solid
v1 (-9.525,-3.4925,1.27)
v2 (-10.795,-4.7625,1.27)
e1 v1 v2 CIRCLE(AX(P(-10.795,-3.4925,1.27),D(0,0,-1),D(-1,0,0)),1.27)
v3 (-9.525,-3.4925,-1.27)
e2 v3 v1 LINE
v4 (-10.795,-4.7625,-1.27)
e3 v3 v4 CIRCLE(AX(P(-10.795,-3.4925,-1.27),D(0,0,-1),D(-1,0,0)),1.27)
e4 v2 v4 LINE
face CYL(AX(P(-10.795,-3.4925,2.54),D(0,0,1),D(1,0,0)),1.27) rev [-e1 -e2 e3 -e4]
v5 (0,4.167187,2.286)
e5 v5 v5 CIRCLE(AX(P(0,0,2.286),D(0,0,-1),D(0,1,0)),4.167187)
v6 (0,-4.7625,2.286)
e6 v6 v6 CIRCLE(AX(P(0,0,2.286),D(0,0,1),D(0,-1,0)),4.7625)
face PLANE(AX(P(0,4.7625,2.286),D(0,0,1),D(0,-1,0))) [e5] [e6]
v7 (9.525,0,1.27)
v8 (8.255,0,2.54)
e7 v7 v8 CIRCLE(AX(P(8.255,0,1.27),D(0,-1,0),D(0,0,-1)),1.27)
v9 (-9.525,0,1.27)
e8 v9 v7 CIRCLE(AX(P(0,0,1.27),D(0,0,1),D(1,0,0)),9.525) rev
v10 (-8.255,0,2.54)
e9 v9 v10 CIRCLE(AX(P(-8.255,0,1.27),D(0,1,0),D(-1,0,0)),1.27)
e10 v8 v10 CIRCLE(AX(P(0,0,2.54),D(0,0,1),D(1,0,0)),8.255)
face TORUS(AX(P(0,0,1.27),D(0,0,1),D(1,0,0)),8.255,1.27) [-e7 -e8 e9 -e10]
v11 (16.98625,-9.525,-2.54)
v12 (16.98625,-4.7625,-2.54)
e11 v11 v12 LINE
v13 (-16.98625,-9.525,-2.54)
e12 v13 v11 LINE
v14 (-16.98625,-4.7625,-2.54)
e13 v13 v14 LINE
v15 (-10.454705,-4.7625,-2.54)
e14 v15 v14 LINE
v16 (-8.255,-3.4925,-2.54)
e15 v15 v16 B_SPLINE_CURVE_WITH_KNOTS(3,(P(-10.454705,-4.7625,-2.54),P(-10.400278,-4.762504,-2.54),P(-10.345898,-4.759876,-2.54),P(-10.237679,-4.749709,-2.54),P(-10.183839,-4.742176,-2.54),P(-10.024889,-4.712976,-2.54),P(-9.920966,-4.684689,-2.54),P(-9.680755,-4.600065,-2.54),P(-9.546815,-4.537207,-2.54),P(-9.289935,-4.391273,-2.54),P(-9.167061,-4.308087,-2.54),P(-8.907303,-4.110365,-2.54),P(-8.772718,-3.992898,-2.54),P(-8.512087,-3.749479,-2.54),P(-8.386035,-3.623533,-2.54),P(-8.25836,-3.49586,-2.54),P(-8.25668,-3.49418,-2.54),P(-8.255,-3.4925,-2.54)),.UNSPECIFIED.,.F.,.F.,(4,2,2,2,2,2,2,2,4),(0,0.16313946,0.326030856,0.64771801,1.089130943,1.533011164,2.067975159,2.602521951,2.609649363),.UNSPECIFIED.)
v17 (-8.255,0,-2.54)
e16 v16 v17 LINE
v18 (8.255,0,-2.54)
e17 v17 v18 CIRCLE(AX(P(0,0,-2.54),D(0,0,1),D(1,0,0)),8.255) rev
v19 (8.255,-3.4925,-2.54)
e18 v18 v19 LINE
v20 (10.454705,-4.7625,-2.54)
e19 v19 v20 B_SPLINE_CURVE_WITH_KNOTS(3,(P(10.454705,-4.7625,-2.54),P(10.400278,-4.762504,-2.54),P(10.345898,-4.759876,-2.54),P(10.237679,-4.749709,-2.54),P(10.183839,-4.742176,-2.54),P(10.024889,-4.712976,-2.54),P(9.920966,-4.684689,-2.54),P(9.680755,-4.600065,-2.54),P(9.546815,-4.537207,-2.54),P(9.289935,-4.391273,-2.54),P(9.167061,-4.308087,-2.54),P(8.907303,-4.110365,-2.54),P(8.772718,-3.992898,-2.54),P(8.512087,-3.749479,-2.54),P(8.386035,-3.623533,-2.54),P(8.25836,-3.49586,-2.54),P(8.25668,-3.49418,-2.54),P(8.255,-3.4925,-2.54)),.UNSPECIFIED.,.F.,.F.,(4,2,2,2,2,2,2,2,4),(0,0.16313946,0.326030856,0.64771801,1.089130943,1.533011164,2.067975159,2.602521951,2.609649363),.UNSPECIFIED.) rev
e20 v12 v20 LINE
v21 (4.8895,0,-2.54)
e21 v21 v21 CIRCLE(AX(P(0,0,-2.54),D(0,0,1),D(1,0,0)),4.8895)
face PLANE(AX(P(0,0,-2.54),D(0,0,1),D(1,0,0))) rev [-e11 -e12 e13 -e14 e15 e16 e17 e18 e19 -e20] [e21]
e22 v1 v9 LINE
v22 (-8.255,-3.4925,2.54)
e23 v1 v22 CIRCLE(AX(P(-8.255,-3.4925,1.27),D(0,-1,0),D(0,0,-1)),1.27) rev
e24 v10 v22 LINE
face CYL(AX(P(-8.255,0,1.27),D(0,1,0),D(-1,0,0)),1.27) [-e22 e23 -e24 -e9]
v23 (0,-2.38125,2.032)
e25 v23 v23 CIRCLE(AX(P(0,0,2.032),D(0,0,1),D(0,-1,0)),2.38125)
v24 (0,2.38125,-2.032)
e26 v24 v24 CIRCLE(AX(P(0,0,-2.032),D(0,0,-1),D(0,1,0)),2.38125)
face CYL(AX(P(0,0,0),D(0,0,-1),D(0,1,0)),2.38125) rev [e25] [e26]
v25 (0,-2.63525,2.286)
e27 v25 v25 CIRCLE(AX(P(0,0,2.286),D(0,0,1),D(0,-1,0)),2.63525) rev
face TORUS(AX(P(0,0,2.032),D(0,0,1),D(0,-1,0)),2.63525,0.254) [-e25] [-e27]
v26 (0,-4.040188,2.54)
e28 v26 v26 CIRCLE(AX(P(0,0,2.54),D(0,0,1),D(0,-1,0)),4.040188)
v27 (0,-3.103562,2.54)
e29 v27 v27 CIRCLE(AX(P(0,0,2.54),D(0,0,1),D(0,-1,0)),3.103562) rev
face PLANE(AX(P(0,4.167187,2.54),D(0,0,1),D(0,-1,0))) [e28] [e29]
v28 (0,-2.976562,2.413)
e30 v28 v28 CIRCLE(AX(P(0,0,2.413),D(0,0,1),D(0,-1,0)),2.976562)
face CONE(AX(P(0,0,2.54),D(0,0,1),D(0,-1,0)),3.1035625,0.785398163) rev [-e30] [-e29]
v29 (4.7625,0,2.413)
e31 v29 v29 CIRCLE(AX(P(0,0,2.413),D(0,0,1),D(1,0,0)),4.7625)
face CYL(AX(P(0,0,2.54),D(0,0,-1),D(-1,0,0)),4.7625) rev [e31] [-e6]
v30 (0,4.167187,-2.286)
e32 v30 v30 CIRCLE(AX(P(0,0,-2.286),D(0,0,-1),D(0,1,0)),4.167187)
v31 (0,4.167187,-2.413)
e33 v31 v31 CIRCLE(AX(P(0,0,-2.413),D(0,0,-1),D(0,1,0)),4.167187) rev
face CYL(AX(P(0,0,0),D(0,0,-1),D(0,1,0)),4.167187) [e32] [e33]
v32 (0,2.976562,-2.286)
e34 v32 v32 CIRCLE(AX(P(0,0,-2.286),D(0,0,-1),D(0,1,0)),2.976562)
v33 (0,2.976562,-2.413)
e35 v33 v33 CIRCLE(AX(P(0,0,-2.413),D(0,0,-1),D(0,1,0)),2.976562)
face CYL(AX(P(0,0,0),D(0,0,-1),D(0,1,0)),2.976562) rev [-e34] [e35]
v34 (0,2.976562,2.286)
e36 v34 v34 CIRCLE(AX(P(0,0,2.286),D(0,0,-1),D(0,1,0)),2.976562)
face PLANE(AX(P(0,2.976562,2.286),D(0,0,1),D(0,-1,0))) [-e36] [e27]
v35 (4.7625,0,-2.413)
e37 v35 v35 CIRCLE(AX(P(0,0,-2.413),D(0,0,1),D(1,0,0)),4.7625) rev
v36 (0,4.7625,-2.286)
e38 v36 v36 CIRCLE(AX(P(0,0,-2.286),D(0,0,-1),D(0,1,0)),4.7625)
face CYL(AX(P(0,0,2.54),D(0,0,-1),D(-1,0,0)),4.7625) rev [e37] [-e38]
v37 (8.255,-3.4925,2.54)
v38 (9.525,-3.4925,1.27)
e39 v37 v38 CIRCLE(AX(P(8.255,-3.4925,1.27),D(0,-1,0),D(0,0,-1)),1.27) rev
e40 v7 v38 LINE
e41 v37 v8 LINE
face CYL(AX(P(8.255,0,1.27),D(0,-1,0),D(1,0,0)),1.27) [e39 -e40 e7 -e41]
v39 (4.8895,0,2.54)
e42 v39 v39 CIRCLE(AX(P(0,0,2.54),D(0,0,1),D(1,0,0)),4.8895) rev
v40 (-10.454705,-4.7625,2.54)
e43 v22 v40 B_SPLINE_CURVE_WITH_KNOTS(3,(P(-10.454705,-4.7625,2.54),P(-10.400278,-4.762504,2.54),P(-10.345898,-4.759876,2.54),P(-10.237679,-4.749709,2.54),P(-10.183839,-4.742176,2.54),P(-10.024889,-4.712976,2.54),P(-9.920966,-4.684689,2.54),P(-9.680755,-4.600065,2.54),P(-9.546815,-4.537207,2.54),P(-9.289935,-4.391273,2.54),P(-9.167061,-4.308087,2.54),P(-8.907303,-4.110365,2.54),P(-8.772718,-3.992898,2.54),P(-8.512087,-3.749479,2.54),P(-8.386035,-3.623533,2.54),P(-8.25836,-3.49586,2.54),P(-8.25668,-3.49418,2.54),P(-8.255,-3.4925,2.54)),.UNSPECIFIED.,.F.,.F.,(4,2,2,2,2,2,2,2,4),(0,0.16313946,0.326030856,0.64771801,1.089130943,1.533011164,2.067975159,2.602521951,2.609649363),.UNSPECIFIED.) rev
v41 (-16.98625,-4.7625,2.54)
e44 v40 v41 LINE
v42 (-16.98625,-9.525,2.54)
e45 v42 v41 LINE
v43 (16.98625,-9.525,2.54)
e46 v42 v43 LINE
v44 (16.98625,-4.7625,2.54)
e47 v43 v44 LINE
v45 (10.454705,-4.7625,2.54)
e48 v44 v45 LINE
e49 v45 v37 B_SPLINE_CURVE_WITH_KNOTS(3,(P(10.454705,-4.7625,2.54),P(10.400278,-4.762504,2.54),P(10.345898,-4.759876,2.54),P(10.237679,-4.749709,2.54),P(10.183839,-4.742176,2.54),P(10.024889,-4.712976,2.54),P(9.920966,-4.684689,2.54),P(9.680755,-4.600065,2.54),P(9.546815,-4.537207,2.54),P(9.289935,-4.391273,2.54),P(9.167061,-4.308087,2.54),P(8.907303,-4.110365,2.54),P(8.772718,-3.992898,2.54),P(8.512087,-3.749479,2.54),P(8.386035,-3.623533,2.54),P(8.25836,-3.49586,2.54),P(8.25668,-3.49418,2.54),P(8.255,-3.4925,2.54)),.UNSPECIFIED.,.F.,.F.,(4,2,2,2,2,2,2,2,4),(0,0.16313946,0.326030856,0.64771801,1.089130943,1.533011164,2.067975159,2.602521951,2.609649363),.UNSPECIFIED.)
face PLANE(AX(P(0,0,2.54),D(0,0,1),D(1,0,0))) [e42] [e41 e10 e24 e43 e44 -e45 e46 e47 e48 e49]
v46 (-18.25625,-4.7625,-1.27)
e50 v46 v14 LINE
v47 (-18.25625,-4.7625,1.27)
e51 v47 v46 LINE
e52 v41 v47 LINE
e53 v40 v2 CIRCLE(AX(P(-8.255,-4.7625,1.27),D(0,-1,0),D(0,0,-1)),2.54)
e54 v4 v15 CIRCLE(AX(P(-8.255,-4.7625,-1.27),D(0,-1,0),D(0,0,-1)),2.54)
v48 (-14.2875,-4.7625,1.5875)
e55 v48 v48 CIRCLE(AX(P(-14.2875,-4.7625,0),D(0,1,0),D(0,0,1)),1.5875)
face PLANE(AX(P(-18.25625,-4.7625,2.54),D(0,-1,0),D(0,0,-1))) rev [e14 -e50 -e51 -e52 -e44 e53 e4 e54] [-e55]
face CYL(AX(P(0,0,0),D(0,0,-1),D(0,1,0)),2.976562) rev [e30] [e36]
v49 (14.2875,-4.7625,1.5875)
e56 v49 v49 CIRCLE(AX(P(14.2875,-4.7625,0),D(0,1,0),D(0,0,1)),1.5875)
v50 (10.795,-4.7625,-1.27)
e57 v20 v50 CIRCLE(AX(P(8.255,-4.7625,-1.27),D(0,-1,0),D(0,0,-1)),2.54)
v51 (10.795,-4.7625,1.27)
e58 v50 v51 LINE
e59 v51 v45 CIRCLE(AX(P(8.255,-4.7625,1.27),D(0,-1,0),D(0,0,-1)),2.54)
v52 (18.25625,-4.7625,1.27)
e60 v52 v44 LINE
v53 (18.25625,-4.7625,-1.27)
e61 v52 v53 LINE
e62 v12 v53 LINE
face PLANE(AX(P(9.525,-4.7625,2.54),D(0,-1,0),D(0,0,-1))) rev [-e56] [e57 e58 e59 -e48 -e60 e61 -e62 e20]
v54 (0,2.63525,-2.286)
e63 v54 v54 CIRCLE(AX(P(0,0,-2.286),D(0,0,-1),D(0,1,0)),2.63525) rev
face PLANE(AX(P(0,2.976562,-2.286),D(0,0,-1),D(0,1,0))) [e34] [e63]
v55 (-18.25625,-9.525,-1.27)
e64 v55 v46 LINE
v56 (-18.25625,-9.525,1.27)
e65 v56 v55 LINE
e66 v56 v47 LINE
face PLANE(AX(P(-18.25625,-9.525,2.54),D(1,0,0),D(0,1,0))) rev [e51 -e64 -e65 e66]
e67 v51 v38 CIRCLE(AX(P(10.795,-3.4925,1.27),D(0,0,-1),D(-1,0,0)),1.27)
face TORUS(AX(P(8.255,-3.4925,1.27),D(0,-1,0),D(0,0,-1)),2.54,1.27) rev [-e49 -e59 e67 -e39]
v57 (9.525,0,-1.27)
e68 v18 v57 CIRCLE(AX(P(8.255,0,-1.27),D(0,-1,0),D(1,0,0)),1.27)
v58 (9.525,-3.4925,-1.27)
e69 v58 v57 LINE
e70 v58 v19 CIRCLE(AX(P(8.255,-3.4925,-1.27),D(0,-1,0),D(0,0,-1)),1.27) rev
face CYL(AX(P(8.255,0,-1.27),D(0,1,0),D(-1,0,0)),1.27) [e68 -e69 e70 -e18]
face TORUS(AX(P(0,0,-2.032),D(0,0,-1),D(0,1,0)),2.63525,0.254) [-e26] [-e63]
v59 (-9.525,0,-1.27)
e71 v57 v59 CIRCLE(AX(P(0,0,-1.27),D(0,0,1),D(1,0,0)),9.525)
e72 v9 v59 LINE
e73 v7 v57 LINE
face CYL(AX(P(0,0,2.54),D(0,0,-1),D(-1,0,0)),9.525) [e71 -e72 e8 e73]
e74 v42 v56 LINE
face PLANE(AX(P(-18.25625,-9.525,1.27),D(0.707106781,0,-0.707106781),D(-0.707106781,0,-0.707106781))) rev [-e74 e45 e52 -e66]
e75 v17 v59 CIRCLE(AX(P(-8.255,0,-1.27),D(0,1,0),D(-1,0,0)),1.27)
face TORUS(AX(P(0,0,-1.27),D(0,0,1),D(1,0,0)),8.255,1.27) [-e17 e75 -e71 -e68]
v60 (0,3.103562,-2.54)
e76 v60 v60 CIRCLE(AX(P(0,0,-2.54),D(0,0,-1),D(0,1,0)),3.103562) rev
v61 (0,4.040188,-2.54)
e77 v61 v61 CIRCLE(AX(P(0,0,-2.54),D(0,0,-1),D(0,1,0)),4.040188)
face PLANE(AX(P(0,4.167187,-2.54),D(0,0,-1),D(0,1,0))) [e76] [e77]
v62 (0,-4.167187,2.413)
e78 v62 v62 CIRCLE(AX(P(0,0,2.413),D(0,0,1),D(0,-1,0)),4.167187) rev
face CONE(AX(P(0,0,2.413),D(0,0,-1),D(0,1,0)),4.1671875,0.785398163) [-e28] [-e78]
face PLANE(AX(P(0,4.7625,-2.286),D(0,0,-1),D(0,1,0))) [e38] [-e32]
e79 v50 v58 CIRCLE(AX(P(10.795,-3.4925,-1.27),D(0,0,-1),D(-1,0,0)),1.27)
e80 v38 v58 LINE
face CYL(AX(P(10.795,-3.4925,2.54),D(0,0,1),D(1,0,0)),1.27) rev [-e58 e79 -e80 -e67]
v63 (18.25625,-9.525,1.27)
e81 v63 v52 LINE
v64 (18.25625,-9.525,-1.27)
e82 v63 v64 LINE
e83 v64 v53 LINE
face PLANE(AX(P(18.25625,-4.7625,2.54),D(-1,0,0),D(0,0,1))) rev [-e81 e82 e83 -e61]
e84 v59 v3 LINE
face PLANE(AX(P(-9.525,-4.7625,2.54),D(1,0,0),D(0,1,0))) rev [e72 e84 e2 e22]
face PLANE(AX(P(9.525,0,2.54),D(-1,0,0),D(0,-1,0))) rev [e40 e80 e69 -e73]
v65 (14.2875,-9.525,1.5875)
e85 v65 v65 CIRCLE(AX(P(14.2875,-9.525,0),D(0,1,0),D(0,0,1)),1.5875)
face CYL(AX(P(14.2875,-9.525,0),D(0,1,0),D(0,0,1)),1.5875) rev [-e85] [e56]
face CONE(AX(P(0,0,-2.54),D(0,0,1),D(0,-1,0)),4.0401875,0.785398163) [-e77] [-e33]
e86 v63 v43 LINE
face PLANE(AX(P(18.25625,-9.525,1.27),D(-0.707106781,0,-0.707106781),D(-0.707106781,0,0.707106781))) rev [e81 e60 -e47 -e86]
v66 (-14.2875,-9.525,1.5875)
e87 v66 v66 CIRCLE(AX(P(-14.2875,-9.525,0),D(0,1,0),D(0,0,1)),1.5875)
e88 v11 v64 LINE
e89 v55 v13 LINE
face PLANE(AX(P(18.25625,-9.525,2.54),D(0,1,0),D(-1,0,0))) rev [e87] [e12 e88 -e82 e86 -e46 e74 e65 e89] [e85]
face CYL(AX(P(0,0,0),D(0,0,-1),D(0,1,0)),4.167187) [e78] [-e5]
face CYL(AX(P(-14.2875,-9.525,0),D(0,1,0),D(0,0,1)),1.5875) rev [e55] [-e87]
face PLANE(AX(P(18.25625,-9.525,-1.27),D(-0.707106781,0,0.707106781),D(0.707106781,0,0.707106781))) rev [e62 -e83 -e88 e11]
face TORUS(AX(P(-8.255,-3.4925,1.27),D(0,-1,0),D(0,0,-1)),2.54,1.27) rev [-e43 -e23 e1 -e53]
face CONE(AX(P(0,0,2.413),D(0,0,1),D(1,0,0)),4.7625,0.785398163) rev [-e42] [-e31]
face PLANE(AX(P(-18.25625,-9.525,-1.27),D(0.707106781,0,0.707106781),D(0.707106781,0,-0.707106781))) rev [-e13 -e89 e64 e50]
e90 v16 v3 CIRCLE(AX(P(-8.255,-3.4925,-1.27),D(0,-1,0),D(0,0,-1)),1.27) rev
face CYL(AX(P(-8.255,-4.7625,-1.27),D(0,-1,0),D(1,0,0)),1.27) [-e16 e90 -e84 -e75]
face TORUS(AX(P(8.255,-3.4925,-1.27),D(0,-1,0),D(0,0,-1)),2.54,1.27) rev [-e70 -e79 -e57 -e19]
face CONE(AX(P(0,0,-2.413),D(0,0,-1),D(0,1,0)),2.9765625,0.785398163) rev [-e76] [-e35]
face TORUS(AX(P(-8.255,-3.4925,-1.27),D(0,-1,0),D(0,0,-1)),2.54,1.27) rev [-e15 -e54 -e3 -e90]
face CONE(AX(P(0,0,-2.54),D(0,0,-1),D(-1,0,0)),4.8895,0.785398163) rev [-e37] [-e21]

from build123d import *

# Parameters (mm, degrees)
EXTRUDE1_DEPTH      = 2.54
EXTRUDE1_DEPTH_BACK = 2.54
SKETCH3_R           = 4.7625
SKETCH4_R           = 1.5875
CUT_EXTRUDE1_DEPTH  = 24.321126052
FILLET1_R           = 1.27
FILLET2_R           = 1.27
CHAMFER1_SIZE       = 0.127
FILLET3_R           = 0.254
CHAMFER2_SIZE       = 0.127


with BuildPart() as part:
    # Sketch3 → Extrude1 (new, two sides: drawn at the far end of the back side and taken through both)
    with BuildSketch(Plane.XY.offset(-EXTRUDE1_DEPTH_BACK)):
        with BuildLine():
            Line((9.525, 0), (9.525, -4.7625))
            Line((9.525, -4.7625), (18.25625, -4.7625))
            Line((18.25625, -4.7625), (18.25625, -9.525))
            Line((18.25625, -9.525), (-18.25625, -9.525))
            Line((-18.25625, -9.525), (-18.25625, -4.7625))
            Line((-18.25625, -4.7625), (-9.525, -4.7625))
            Line((-9.525, -4.7625), (-9.525, 0))
            ThreePointArc((-9.525, 0), (0, 9.525), (9.525, 0))
        make_face()
        Circle(SKETCH3_R, mode=Mode.SUBTRACT)
    extrude(amount=EXTRUDE1_DEPTH + EXTRUDE1_DEPTH_BACK)

    # Sketch4 → Cut-Extrude1 (cut, through all)
    with BuildSketch(Plane(origin=(0, -4.7625, 0), x_dir=(1, 0, 0), z_dir=(0, 1, 0))):
        with Locations(Location((-14.2875, 0, 0), (0, 0, 270))):
            Circle(SKETCH4_R)
        with Locations(Location((14.2875, 0, 0), (0, 0, 270))):
            Circle(SKETCH4_R)
        Polygon((-18.25625, 2.54), (-18.25625, 1.27), (-16.98625, 2.54), align=None)
        Polygon((16.98625, 2.54), (18.25625, 2.54), (18.25625, 1.27), align=None)
        Polygon((18.25625, -2.54), (18.25625, -1.27), (16.98625, -2.54), align=None)
        Polygon((-16.98625, -2.54), (-18.25625, -2.54), (-18.25625, -1.27), align=None)
    extrude(amount=-CUT_EXTRUDE1_DEPTH, mode=Mode.SUBTRACT)

    # Fillet1
    fillet1_edges = [part.edges().sort_by_distance(p)[0] for p in [
        (0, 9.525, -2.54),
        (9.525, -2.38125, -2.54),
        (9.525, -2.38125, 2.54),
        (-9.525, -2.38125, -2.54),
        (0, 9.525, 2.54),
        (-9.525, -2.38125, 2.54),
    ]]
    fillet(fillet1_edges, radius=FILLET1_R)

    # Fillet2
    # the kernel refuses this fillet: 1.27 mm, written as the material it adds along each edge
    with BuildSketch(Plane(origin=(-9.525, -4.7625, -1.27), x_dir=(0, 1, 0), z_dir=(0, 0, 1)), Plane(origin=(9.525, -4.7625, 1.27), x_dir=(0, 1, 0), z_dir=(0, 0, -1))) as fillet2_piece_1:
        with BuildLine():
            CenterArc((FILLET2_R, FILLET2_R), FILLET2_R, 180, 90)
            Line((0, FILLET2_R), (0, 0))
            Line((0, 0), (FILLET2_R, 0))
        make_face()
    extrude(amount=2.54)
    with BuildSketch(Plane(origin=(8.255, -4.7625, -1.27), x_dir=(-0.5976672776328268, 0, 0.8017442392976488), z_dir=(0.8017442392976488, 0, 0.5976672776328268))) as fillet2_piece_2_section:
        with BuildLine():
            CenterArc((1.27 + FILLET2_R, -FILLET2_R), FILLET2_R, 90, 90)
            Line((1.27 + FILLET2_R, 0), (1.27, 0))
            Line((1.27, 0), (1.27, -FILLET2_R))
        make_face()
    fillet2_piece_2 = revolve(axis=Axis((8.255, -4.7625, -1.27), (0, -1, 0)), revolution_arc=233.296989237, mode=Mode.PRIVATE)
    fillet2_piece_2 = split(fillet2_piece_2, bisect_by=Plane(origin=(9.207422318, -4.366731678, -2.54), z_dir=(0, 0, 1)), keep=Keep.TOP, mode=Mode.PRIVATE)
    add(fillet2_piece_2)
    with BuildSketch(Plane(origin=(-8.255, -4.7625, -1.27), x_dir=(0.5976672776328281, 0, 0.8017442392976479), z_dir=(-0.8017442392976479, 0, 0.5976672776328281))) as fillet2_piece_3_section:
        with BuildLine():
            CenterArc((1.27 + FILLET2_R, FILLET2_R), FILLET2_R, 180, 90)
            Line((1.27, FILLET2_R), (1.27, 0))
            Line((1.27, 0), (1.27 + FILLET2_R, 0))
        make_face()
    fillet2_piece_3 = revolve(axis=Axis((-8.255, -4.7625, -1.27), (0, 1, 0)), revolution_arc=233.296989237, mode=Mode.PRIVATE)
    fillet2_piece_3 = split(fillet2_piece_3, bisect_by=Plane(origin=(-9.207422451, -4.366732131, -2.54), z_dir=(0, 0, 1)), keep=Keep.TOP, mode=Mode.PRIVATE)
    add(fillet2_piece_3)
    with BuildSketch(Plane(origin=(8.255, -4.7625, 1.27), x_dir=(1, 0, 0), z_dir=(0, 0, -1))) as fillet2_piece_4_section:
        with BuildLine():
            CenterArc((1.27 + FILLET2_R, -FILLET2_R), FILLET2_R, 90, 90)
            Line((1.27 + FILLET2_R, 0), (1.27, 0))
            Line((1.27, 0), (1.27, -FILLET2_R))
        make_face()
    fillet2_piece_4 = revolve(axis=Axis((8.255, -4.7625, 1.27), (0, -1, 0)), revolution_arc=233.296989237, mode=Mode.PRIVATE)
    fillet2_piece_4 = split(fillet2_piece_4, bisect_by=Plane(origin=(9.207422382, -4.366731938, 2.54), z_dir=(0, 0, -1)), keep=Keep.TOP, mode=Mode.PRIVATE)
    add(fillet2_piece_4)
    with BuildSketch(Plane(origin=(-8.255, -4.7625, 1.27), x_dir=(-1, 0, 0), z_dir=(0, 0, -1))) as fillet2_piece_5_section:
        with BuildLine():
            CenterArc((1.27 + FILLET2_R, FILLET2_R), FILLET2_R, 180, 90)
            Line((1.27, FILLET2_R), (1.27, 0))
            Line((1.27, 0), (1.27 + FILLET2_R, 0))
        make_face()
    fillet2_piece_5 = revolve(axis=Axis((-8.255, -4.7625, 1.27), (0, 1, 0)), revolution_arc=233.296989237, mode=Mode.PRIVATE)
    fillet2_piece_5 = split(fillet2_piece_5, bisect_by=Plane(origin=(-9.804114567, -4.550028742, 2.54), z_dir=(0, 0, -1)), keep=Keep.TOP, mode=Mode.PRIVATE)
    add(fillet2_piece_5)

    # Chamfer1
    chamfer1_edges = [part.edges().sort_by_distance(p)[0] for p in [
        (-4.7625, 0, 2.54),
        (-4.7625, 0, -2.54),
    ]]
    chamfer(chamfer1_edges, length=CHAMFER1_SIZE)

    # Sketch5 → Revolve1 (revolve)
    with BuildSketch(Plane(origin=(0, 0, 0), x_dir=(0, 0, -1), z_dir=(1, 0, 0))):
        Polygon((-2.286, 4.7625), (-2.286, 4.1671875), (-2.54, 4.1671875), (-2.54, 2.9765625), (-2.286, 2.9765625), (-2.286, 2.38125), (2.286, 2.38125), (2.286, 2.9765625), (2.54, 2.9765625), (2.54, 4.1671875), (2.286, 4.1671875), (2.286, 4.7625), align=None)
    revolve(axis=Axis((0, 0, 0), (0, 0, 1)))

    # Fillet3
    fillet3_edges = [part.edges().sort_by_distance(p)[0] for p in [
        (0, -2.38125, -2.286),
        (0, -2.38125, 2.286),
    ]]
    fillet(fillet3_edges, radius=FILLET3_R)

    # Chamfer2
    chamfer2_edges = [part.edges().sort_by_distance(p)[0] for p in [
        (0, -4.1671875, -2.54),
        (0, -2.9765625, -2.54),
        (0, -2.9765625, 2.54),
        (0, -4.1671875, 2.54),
    ]]
    chamfer(chamfer2_edges, length=CHAMFER2_SIZE)


solid = part.part
